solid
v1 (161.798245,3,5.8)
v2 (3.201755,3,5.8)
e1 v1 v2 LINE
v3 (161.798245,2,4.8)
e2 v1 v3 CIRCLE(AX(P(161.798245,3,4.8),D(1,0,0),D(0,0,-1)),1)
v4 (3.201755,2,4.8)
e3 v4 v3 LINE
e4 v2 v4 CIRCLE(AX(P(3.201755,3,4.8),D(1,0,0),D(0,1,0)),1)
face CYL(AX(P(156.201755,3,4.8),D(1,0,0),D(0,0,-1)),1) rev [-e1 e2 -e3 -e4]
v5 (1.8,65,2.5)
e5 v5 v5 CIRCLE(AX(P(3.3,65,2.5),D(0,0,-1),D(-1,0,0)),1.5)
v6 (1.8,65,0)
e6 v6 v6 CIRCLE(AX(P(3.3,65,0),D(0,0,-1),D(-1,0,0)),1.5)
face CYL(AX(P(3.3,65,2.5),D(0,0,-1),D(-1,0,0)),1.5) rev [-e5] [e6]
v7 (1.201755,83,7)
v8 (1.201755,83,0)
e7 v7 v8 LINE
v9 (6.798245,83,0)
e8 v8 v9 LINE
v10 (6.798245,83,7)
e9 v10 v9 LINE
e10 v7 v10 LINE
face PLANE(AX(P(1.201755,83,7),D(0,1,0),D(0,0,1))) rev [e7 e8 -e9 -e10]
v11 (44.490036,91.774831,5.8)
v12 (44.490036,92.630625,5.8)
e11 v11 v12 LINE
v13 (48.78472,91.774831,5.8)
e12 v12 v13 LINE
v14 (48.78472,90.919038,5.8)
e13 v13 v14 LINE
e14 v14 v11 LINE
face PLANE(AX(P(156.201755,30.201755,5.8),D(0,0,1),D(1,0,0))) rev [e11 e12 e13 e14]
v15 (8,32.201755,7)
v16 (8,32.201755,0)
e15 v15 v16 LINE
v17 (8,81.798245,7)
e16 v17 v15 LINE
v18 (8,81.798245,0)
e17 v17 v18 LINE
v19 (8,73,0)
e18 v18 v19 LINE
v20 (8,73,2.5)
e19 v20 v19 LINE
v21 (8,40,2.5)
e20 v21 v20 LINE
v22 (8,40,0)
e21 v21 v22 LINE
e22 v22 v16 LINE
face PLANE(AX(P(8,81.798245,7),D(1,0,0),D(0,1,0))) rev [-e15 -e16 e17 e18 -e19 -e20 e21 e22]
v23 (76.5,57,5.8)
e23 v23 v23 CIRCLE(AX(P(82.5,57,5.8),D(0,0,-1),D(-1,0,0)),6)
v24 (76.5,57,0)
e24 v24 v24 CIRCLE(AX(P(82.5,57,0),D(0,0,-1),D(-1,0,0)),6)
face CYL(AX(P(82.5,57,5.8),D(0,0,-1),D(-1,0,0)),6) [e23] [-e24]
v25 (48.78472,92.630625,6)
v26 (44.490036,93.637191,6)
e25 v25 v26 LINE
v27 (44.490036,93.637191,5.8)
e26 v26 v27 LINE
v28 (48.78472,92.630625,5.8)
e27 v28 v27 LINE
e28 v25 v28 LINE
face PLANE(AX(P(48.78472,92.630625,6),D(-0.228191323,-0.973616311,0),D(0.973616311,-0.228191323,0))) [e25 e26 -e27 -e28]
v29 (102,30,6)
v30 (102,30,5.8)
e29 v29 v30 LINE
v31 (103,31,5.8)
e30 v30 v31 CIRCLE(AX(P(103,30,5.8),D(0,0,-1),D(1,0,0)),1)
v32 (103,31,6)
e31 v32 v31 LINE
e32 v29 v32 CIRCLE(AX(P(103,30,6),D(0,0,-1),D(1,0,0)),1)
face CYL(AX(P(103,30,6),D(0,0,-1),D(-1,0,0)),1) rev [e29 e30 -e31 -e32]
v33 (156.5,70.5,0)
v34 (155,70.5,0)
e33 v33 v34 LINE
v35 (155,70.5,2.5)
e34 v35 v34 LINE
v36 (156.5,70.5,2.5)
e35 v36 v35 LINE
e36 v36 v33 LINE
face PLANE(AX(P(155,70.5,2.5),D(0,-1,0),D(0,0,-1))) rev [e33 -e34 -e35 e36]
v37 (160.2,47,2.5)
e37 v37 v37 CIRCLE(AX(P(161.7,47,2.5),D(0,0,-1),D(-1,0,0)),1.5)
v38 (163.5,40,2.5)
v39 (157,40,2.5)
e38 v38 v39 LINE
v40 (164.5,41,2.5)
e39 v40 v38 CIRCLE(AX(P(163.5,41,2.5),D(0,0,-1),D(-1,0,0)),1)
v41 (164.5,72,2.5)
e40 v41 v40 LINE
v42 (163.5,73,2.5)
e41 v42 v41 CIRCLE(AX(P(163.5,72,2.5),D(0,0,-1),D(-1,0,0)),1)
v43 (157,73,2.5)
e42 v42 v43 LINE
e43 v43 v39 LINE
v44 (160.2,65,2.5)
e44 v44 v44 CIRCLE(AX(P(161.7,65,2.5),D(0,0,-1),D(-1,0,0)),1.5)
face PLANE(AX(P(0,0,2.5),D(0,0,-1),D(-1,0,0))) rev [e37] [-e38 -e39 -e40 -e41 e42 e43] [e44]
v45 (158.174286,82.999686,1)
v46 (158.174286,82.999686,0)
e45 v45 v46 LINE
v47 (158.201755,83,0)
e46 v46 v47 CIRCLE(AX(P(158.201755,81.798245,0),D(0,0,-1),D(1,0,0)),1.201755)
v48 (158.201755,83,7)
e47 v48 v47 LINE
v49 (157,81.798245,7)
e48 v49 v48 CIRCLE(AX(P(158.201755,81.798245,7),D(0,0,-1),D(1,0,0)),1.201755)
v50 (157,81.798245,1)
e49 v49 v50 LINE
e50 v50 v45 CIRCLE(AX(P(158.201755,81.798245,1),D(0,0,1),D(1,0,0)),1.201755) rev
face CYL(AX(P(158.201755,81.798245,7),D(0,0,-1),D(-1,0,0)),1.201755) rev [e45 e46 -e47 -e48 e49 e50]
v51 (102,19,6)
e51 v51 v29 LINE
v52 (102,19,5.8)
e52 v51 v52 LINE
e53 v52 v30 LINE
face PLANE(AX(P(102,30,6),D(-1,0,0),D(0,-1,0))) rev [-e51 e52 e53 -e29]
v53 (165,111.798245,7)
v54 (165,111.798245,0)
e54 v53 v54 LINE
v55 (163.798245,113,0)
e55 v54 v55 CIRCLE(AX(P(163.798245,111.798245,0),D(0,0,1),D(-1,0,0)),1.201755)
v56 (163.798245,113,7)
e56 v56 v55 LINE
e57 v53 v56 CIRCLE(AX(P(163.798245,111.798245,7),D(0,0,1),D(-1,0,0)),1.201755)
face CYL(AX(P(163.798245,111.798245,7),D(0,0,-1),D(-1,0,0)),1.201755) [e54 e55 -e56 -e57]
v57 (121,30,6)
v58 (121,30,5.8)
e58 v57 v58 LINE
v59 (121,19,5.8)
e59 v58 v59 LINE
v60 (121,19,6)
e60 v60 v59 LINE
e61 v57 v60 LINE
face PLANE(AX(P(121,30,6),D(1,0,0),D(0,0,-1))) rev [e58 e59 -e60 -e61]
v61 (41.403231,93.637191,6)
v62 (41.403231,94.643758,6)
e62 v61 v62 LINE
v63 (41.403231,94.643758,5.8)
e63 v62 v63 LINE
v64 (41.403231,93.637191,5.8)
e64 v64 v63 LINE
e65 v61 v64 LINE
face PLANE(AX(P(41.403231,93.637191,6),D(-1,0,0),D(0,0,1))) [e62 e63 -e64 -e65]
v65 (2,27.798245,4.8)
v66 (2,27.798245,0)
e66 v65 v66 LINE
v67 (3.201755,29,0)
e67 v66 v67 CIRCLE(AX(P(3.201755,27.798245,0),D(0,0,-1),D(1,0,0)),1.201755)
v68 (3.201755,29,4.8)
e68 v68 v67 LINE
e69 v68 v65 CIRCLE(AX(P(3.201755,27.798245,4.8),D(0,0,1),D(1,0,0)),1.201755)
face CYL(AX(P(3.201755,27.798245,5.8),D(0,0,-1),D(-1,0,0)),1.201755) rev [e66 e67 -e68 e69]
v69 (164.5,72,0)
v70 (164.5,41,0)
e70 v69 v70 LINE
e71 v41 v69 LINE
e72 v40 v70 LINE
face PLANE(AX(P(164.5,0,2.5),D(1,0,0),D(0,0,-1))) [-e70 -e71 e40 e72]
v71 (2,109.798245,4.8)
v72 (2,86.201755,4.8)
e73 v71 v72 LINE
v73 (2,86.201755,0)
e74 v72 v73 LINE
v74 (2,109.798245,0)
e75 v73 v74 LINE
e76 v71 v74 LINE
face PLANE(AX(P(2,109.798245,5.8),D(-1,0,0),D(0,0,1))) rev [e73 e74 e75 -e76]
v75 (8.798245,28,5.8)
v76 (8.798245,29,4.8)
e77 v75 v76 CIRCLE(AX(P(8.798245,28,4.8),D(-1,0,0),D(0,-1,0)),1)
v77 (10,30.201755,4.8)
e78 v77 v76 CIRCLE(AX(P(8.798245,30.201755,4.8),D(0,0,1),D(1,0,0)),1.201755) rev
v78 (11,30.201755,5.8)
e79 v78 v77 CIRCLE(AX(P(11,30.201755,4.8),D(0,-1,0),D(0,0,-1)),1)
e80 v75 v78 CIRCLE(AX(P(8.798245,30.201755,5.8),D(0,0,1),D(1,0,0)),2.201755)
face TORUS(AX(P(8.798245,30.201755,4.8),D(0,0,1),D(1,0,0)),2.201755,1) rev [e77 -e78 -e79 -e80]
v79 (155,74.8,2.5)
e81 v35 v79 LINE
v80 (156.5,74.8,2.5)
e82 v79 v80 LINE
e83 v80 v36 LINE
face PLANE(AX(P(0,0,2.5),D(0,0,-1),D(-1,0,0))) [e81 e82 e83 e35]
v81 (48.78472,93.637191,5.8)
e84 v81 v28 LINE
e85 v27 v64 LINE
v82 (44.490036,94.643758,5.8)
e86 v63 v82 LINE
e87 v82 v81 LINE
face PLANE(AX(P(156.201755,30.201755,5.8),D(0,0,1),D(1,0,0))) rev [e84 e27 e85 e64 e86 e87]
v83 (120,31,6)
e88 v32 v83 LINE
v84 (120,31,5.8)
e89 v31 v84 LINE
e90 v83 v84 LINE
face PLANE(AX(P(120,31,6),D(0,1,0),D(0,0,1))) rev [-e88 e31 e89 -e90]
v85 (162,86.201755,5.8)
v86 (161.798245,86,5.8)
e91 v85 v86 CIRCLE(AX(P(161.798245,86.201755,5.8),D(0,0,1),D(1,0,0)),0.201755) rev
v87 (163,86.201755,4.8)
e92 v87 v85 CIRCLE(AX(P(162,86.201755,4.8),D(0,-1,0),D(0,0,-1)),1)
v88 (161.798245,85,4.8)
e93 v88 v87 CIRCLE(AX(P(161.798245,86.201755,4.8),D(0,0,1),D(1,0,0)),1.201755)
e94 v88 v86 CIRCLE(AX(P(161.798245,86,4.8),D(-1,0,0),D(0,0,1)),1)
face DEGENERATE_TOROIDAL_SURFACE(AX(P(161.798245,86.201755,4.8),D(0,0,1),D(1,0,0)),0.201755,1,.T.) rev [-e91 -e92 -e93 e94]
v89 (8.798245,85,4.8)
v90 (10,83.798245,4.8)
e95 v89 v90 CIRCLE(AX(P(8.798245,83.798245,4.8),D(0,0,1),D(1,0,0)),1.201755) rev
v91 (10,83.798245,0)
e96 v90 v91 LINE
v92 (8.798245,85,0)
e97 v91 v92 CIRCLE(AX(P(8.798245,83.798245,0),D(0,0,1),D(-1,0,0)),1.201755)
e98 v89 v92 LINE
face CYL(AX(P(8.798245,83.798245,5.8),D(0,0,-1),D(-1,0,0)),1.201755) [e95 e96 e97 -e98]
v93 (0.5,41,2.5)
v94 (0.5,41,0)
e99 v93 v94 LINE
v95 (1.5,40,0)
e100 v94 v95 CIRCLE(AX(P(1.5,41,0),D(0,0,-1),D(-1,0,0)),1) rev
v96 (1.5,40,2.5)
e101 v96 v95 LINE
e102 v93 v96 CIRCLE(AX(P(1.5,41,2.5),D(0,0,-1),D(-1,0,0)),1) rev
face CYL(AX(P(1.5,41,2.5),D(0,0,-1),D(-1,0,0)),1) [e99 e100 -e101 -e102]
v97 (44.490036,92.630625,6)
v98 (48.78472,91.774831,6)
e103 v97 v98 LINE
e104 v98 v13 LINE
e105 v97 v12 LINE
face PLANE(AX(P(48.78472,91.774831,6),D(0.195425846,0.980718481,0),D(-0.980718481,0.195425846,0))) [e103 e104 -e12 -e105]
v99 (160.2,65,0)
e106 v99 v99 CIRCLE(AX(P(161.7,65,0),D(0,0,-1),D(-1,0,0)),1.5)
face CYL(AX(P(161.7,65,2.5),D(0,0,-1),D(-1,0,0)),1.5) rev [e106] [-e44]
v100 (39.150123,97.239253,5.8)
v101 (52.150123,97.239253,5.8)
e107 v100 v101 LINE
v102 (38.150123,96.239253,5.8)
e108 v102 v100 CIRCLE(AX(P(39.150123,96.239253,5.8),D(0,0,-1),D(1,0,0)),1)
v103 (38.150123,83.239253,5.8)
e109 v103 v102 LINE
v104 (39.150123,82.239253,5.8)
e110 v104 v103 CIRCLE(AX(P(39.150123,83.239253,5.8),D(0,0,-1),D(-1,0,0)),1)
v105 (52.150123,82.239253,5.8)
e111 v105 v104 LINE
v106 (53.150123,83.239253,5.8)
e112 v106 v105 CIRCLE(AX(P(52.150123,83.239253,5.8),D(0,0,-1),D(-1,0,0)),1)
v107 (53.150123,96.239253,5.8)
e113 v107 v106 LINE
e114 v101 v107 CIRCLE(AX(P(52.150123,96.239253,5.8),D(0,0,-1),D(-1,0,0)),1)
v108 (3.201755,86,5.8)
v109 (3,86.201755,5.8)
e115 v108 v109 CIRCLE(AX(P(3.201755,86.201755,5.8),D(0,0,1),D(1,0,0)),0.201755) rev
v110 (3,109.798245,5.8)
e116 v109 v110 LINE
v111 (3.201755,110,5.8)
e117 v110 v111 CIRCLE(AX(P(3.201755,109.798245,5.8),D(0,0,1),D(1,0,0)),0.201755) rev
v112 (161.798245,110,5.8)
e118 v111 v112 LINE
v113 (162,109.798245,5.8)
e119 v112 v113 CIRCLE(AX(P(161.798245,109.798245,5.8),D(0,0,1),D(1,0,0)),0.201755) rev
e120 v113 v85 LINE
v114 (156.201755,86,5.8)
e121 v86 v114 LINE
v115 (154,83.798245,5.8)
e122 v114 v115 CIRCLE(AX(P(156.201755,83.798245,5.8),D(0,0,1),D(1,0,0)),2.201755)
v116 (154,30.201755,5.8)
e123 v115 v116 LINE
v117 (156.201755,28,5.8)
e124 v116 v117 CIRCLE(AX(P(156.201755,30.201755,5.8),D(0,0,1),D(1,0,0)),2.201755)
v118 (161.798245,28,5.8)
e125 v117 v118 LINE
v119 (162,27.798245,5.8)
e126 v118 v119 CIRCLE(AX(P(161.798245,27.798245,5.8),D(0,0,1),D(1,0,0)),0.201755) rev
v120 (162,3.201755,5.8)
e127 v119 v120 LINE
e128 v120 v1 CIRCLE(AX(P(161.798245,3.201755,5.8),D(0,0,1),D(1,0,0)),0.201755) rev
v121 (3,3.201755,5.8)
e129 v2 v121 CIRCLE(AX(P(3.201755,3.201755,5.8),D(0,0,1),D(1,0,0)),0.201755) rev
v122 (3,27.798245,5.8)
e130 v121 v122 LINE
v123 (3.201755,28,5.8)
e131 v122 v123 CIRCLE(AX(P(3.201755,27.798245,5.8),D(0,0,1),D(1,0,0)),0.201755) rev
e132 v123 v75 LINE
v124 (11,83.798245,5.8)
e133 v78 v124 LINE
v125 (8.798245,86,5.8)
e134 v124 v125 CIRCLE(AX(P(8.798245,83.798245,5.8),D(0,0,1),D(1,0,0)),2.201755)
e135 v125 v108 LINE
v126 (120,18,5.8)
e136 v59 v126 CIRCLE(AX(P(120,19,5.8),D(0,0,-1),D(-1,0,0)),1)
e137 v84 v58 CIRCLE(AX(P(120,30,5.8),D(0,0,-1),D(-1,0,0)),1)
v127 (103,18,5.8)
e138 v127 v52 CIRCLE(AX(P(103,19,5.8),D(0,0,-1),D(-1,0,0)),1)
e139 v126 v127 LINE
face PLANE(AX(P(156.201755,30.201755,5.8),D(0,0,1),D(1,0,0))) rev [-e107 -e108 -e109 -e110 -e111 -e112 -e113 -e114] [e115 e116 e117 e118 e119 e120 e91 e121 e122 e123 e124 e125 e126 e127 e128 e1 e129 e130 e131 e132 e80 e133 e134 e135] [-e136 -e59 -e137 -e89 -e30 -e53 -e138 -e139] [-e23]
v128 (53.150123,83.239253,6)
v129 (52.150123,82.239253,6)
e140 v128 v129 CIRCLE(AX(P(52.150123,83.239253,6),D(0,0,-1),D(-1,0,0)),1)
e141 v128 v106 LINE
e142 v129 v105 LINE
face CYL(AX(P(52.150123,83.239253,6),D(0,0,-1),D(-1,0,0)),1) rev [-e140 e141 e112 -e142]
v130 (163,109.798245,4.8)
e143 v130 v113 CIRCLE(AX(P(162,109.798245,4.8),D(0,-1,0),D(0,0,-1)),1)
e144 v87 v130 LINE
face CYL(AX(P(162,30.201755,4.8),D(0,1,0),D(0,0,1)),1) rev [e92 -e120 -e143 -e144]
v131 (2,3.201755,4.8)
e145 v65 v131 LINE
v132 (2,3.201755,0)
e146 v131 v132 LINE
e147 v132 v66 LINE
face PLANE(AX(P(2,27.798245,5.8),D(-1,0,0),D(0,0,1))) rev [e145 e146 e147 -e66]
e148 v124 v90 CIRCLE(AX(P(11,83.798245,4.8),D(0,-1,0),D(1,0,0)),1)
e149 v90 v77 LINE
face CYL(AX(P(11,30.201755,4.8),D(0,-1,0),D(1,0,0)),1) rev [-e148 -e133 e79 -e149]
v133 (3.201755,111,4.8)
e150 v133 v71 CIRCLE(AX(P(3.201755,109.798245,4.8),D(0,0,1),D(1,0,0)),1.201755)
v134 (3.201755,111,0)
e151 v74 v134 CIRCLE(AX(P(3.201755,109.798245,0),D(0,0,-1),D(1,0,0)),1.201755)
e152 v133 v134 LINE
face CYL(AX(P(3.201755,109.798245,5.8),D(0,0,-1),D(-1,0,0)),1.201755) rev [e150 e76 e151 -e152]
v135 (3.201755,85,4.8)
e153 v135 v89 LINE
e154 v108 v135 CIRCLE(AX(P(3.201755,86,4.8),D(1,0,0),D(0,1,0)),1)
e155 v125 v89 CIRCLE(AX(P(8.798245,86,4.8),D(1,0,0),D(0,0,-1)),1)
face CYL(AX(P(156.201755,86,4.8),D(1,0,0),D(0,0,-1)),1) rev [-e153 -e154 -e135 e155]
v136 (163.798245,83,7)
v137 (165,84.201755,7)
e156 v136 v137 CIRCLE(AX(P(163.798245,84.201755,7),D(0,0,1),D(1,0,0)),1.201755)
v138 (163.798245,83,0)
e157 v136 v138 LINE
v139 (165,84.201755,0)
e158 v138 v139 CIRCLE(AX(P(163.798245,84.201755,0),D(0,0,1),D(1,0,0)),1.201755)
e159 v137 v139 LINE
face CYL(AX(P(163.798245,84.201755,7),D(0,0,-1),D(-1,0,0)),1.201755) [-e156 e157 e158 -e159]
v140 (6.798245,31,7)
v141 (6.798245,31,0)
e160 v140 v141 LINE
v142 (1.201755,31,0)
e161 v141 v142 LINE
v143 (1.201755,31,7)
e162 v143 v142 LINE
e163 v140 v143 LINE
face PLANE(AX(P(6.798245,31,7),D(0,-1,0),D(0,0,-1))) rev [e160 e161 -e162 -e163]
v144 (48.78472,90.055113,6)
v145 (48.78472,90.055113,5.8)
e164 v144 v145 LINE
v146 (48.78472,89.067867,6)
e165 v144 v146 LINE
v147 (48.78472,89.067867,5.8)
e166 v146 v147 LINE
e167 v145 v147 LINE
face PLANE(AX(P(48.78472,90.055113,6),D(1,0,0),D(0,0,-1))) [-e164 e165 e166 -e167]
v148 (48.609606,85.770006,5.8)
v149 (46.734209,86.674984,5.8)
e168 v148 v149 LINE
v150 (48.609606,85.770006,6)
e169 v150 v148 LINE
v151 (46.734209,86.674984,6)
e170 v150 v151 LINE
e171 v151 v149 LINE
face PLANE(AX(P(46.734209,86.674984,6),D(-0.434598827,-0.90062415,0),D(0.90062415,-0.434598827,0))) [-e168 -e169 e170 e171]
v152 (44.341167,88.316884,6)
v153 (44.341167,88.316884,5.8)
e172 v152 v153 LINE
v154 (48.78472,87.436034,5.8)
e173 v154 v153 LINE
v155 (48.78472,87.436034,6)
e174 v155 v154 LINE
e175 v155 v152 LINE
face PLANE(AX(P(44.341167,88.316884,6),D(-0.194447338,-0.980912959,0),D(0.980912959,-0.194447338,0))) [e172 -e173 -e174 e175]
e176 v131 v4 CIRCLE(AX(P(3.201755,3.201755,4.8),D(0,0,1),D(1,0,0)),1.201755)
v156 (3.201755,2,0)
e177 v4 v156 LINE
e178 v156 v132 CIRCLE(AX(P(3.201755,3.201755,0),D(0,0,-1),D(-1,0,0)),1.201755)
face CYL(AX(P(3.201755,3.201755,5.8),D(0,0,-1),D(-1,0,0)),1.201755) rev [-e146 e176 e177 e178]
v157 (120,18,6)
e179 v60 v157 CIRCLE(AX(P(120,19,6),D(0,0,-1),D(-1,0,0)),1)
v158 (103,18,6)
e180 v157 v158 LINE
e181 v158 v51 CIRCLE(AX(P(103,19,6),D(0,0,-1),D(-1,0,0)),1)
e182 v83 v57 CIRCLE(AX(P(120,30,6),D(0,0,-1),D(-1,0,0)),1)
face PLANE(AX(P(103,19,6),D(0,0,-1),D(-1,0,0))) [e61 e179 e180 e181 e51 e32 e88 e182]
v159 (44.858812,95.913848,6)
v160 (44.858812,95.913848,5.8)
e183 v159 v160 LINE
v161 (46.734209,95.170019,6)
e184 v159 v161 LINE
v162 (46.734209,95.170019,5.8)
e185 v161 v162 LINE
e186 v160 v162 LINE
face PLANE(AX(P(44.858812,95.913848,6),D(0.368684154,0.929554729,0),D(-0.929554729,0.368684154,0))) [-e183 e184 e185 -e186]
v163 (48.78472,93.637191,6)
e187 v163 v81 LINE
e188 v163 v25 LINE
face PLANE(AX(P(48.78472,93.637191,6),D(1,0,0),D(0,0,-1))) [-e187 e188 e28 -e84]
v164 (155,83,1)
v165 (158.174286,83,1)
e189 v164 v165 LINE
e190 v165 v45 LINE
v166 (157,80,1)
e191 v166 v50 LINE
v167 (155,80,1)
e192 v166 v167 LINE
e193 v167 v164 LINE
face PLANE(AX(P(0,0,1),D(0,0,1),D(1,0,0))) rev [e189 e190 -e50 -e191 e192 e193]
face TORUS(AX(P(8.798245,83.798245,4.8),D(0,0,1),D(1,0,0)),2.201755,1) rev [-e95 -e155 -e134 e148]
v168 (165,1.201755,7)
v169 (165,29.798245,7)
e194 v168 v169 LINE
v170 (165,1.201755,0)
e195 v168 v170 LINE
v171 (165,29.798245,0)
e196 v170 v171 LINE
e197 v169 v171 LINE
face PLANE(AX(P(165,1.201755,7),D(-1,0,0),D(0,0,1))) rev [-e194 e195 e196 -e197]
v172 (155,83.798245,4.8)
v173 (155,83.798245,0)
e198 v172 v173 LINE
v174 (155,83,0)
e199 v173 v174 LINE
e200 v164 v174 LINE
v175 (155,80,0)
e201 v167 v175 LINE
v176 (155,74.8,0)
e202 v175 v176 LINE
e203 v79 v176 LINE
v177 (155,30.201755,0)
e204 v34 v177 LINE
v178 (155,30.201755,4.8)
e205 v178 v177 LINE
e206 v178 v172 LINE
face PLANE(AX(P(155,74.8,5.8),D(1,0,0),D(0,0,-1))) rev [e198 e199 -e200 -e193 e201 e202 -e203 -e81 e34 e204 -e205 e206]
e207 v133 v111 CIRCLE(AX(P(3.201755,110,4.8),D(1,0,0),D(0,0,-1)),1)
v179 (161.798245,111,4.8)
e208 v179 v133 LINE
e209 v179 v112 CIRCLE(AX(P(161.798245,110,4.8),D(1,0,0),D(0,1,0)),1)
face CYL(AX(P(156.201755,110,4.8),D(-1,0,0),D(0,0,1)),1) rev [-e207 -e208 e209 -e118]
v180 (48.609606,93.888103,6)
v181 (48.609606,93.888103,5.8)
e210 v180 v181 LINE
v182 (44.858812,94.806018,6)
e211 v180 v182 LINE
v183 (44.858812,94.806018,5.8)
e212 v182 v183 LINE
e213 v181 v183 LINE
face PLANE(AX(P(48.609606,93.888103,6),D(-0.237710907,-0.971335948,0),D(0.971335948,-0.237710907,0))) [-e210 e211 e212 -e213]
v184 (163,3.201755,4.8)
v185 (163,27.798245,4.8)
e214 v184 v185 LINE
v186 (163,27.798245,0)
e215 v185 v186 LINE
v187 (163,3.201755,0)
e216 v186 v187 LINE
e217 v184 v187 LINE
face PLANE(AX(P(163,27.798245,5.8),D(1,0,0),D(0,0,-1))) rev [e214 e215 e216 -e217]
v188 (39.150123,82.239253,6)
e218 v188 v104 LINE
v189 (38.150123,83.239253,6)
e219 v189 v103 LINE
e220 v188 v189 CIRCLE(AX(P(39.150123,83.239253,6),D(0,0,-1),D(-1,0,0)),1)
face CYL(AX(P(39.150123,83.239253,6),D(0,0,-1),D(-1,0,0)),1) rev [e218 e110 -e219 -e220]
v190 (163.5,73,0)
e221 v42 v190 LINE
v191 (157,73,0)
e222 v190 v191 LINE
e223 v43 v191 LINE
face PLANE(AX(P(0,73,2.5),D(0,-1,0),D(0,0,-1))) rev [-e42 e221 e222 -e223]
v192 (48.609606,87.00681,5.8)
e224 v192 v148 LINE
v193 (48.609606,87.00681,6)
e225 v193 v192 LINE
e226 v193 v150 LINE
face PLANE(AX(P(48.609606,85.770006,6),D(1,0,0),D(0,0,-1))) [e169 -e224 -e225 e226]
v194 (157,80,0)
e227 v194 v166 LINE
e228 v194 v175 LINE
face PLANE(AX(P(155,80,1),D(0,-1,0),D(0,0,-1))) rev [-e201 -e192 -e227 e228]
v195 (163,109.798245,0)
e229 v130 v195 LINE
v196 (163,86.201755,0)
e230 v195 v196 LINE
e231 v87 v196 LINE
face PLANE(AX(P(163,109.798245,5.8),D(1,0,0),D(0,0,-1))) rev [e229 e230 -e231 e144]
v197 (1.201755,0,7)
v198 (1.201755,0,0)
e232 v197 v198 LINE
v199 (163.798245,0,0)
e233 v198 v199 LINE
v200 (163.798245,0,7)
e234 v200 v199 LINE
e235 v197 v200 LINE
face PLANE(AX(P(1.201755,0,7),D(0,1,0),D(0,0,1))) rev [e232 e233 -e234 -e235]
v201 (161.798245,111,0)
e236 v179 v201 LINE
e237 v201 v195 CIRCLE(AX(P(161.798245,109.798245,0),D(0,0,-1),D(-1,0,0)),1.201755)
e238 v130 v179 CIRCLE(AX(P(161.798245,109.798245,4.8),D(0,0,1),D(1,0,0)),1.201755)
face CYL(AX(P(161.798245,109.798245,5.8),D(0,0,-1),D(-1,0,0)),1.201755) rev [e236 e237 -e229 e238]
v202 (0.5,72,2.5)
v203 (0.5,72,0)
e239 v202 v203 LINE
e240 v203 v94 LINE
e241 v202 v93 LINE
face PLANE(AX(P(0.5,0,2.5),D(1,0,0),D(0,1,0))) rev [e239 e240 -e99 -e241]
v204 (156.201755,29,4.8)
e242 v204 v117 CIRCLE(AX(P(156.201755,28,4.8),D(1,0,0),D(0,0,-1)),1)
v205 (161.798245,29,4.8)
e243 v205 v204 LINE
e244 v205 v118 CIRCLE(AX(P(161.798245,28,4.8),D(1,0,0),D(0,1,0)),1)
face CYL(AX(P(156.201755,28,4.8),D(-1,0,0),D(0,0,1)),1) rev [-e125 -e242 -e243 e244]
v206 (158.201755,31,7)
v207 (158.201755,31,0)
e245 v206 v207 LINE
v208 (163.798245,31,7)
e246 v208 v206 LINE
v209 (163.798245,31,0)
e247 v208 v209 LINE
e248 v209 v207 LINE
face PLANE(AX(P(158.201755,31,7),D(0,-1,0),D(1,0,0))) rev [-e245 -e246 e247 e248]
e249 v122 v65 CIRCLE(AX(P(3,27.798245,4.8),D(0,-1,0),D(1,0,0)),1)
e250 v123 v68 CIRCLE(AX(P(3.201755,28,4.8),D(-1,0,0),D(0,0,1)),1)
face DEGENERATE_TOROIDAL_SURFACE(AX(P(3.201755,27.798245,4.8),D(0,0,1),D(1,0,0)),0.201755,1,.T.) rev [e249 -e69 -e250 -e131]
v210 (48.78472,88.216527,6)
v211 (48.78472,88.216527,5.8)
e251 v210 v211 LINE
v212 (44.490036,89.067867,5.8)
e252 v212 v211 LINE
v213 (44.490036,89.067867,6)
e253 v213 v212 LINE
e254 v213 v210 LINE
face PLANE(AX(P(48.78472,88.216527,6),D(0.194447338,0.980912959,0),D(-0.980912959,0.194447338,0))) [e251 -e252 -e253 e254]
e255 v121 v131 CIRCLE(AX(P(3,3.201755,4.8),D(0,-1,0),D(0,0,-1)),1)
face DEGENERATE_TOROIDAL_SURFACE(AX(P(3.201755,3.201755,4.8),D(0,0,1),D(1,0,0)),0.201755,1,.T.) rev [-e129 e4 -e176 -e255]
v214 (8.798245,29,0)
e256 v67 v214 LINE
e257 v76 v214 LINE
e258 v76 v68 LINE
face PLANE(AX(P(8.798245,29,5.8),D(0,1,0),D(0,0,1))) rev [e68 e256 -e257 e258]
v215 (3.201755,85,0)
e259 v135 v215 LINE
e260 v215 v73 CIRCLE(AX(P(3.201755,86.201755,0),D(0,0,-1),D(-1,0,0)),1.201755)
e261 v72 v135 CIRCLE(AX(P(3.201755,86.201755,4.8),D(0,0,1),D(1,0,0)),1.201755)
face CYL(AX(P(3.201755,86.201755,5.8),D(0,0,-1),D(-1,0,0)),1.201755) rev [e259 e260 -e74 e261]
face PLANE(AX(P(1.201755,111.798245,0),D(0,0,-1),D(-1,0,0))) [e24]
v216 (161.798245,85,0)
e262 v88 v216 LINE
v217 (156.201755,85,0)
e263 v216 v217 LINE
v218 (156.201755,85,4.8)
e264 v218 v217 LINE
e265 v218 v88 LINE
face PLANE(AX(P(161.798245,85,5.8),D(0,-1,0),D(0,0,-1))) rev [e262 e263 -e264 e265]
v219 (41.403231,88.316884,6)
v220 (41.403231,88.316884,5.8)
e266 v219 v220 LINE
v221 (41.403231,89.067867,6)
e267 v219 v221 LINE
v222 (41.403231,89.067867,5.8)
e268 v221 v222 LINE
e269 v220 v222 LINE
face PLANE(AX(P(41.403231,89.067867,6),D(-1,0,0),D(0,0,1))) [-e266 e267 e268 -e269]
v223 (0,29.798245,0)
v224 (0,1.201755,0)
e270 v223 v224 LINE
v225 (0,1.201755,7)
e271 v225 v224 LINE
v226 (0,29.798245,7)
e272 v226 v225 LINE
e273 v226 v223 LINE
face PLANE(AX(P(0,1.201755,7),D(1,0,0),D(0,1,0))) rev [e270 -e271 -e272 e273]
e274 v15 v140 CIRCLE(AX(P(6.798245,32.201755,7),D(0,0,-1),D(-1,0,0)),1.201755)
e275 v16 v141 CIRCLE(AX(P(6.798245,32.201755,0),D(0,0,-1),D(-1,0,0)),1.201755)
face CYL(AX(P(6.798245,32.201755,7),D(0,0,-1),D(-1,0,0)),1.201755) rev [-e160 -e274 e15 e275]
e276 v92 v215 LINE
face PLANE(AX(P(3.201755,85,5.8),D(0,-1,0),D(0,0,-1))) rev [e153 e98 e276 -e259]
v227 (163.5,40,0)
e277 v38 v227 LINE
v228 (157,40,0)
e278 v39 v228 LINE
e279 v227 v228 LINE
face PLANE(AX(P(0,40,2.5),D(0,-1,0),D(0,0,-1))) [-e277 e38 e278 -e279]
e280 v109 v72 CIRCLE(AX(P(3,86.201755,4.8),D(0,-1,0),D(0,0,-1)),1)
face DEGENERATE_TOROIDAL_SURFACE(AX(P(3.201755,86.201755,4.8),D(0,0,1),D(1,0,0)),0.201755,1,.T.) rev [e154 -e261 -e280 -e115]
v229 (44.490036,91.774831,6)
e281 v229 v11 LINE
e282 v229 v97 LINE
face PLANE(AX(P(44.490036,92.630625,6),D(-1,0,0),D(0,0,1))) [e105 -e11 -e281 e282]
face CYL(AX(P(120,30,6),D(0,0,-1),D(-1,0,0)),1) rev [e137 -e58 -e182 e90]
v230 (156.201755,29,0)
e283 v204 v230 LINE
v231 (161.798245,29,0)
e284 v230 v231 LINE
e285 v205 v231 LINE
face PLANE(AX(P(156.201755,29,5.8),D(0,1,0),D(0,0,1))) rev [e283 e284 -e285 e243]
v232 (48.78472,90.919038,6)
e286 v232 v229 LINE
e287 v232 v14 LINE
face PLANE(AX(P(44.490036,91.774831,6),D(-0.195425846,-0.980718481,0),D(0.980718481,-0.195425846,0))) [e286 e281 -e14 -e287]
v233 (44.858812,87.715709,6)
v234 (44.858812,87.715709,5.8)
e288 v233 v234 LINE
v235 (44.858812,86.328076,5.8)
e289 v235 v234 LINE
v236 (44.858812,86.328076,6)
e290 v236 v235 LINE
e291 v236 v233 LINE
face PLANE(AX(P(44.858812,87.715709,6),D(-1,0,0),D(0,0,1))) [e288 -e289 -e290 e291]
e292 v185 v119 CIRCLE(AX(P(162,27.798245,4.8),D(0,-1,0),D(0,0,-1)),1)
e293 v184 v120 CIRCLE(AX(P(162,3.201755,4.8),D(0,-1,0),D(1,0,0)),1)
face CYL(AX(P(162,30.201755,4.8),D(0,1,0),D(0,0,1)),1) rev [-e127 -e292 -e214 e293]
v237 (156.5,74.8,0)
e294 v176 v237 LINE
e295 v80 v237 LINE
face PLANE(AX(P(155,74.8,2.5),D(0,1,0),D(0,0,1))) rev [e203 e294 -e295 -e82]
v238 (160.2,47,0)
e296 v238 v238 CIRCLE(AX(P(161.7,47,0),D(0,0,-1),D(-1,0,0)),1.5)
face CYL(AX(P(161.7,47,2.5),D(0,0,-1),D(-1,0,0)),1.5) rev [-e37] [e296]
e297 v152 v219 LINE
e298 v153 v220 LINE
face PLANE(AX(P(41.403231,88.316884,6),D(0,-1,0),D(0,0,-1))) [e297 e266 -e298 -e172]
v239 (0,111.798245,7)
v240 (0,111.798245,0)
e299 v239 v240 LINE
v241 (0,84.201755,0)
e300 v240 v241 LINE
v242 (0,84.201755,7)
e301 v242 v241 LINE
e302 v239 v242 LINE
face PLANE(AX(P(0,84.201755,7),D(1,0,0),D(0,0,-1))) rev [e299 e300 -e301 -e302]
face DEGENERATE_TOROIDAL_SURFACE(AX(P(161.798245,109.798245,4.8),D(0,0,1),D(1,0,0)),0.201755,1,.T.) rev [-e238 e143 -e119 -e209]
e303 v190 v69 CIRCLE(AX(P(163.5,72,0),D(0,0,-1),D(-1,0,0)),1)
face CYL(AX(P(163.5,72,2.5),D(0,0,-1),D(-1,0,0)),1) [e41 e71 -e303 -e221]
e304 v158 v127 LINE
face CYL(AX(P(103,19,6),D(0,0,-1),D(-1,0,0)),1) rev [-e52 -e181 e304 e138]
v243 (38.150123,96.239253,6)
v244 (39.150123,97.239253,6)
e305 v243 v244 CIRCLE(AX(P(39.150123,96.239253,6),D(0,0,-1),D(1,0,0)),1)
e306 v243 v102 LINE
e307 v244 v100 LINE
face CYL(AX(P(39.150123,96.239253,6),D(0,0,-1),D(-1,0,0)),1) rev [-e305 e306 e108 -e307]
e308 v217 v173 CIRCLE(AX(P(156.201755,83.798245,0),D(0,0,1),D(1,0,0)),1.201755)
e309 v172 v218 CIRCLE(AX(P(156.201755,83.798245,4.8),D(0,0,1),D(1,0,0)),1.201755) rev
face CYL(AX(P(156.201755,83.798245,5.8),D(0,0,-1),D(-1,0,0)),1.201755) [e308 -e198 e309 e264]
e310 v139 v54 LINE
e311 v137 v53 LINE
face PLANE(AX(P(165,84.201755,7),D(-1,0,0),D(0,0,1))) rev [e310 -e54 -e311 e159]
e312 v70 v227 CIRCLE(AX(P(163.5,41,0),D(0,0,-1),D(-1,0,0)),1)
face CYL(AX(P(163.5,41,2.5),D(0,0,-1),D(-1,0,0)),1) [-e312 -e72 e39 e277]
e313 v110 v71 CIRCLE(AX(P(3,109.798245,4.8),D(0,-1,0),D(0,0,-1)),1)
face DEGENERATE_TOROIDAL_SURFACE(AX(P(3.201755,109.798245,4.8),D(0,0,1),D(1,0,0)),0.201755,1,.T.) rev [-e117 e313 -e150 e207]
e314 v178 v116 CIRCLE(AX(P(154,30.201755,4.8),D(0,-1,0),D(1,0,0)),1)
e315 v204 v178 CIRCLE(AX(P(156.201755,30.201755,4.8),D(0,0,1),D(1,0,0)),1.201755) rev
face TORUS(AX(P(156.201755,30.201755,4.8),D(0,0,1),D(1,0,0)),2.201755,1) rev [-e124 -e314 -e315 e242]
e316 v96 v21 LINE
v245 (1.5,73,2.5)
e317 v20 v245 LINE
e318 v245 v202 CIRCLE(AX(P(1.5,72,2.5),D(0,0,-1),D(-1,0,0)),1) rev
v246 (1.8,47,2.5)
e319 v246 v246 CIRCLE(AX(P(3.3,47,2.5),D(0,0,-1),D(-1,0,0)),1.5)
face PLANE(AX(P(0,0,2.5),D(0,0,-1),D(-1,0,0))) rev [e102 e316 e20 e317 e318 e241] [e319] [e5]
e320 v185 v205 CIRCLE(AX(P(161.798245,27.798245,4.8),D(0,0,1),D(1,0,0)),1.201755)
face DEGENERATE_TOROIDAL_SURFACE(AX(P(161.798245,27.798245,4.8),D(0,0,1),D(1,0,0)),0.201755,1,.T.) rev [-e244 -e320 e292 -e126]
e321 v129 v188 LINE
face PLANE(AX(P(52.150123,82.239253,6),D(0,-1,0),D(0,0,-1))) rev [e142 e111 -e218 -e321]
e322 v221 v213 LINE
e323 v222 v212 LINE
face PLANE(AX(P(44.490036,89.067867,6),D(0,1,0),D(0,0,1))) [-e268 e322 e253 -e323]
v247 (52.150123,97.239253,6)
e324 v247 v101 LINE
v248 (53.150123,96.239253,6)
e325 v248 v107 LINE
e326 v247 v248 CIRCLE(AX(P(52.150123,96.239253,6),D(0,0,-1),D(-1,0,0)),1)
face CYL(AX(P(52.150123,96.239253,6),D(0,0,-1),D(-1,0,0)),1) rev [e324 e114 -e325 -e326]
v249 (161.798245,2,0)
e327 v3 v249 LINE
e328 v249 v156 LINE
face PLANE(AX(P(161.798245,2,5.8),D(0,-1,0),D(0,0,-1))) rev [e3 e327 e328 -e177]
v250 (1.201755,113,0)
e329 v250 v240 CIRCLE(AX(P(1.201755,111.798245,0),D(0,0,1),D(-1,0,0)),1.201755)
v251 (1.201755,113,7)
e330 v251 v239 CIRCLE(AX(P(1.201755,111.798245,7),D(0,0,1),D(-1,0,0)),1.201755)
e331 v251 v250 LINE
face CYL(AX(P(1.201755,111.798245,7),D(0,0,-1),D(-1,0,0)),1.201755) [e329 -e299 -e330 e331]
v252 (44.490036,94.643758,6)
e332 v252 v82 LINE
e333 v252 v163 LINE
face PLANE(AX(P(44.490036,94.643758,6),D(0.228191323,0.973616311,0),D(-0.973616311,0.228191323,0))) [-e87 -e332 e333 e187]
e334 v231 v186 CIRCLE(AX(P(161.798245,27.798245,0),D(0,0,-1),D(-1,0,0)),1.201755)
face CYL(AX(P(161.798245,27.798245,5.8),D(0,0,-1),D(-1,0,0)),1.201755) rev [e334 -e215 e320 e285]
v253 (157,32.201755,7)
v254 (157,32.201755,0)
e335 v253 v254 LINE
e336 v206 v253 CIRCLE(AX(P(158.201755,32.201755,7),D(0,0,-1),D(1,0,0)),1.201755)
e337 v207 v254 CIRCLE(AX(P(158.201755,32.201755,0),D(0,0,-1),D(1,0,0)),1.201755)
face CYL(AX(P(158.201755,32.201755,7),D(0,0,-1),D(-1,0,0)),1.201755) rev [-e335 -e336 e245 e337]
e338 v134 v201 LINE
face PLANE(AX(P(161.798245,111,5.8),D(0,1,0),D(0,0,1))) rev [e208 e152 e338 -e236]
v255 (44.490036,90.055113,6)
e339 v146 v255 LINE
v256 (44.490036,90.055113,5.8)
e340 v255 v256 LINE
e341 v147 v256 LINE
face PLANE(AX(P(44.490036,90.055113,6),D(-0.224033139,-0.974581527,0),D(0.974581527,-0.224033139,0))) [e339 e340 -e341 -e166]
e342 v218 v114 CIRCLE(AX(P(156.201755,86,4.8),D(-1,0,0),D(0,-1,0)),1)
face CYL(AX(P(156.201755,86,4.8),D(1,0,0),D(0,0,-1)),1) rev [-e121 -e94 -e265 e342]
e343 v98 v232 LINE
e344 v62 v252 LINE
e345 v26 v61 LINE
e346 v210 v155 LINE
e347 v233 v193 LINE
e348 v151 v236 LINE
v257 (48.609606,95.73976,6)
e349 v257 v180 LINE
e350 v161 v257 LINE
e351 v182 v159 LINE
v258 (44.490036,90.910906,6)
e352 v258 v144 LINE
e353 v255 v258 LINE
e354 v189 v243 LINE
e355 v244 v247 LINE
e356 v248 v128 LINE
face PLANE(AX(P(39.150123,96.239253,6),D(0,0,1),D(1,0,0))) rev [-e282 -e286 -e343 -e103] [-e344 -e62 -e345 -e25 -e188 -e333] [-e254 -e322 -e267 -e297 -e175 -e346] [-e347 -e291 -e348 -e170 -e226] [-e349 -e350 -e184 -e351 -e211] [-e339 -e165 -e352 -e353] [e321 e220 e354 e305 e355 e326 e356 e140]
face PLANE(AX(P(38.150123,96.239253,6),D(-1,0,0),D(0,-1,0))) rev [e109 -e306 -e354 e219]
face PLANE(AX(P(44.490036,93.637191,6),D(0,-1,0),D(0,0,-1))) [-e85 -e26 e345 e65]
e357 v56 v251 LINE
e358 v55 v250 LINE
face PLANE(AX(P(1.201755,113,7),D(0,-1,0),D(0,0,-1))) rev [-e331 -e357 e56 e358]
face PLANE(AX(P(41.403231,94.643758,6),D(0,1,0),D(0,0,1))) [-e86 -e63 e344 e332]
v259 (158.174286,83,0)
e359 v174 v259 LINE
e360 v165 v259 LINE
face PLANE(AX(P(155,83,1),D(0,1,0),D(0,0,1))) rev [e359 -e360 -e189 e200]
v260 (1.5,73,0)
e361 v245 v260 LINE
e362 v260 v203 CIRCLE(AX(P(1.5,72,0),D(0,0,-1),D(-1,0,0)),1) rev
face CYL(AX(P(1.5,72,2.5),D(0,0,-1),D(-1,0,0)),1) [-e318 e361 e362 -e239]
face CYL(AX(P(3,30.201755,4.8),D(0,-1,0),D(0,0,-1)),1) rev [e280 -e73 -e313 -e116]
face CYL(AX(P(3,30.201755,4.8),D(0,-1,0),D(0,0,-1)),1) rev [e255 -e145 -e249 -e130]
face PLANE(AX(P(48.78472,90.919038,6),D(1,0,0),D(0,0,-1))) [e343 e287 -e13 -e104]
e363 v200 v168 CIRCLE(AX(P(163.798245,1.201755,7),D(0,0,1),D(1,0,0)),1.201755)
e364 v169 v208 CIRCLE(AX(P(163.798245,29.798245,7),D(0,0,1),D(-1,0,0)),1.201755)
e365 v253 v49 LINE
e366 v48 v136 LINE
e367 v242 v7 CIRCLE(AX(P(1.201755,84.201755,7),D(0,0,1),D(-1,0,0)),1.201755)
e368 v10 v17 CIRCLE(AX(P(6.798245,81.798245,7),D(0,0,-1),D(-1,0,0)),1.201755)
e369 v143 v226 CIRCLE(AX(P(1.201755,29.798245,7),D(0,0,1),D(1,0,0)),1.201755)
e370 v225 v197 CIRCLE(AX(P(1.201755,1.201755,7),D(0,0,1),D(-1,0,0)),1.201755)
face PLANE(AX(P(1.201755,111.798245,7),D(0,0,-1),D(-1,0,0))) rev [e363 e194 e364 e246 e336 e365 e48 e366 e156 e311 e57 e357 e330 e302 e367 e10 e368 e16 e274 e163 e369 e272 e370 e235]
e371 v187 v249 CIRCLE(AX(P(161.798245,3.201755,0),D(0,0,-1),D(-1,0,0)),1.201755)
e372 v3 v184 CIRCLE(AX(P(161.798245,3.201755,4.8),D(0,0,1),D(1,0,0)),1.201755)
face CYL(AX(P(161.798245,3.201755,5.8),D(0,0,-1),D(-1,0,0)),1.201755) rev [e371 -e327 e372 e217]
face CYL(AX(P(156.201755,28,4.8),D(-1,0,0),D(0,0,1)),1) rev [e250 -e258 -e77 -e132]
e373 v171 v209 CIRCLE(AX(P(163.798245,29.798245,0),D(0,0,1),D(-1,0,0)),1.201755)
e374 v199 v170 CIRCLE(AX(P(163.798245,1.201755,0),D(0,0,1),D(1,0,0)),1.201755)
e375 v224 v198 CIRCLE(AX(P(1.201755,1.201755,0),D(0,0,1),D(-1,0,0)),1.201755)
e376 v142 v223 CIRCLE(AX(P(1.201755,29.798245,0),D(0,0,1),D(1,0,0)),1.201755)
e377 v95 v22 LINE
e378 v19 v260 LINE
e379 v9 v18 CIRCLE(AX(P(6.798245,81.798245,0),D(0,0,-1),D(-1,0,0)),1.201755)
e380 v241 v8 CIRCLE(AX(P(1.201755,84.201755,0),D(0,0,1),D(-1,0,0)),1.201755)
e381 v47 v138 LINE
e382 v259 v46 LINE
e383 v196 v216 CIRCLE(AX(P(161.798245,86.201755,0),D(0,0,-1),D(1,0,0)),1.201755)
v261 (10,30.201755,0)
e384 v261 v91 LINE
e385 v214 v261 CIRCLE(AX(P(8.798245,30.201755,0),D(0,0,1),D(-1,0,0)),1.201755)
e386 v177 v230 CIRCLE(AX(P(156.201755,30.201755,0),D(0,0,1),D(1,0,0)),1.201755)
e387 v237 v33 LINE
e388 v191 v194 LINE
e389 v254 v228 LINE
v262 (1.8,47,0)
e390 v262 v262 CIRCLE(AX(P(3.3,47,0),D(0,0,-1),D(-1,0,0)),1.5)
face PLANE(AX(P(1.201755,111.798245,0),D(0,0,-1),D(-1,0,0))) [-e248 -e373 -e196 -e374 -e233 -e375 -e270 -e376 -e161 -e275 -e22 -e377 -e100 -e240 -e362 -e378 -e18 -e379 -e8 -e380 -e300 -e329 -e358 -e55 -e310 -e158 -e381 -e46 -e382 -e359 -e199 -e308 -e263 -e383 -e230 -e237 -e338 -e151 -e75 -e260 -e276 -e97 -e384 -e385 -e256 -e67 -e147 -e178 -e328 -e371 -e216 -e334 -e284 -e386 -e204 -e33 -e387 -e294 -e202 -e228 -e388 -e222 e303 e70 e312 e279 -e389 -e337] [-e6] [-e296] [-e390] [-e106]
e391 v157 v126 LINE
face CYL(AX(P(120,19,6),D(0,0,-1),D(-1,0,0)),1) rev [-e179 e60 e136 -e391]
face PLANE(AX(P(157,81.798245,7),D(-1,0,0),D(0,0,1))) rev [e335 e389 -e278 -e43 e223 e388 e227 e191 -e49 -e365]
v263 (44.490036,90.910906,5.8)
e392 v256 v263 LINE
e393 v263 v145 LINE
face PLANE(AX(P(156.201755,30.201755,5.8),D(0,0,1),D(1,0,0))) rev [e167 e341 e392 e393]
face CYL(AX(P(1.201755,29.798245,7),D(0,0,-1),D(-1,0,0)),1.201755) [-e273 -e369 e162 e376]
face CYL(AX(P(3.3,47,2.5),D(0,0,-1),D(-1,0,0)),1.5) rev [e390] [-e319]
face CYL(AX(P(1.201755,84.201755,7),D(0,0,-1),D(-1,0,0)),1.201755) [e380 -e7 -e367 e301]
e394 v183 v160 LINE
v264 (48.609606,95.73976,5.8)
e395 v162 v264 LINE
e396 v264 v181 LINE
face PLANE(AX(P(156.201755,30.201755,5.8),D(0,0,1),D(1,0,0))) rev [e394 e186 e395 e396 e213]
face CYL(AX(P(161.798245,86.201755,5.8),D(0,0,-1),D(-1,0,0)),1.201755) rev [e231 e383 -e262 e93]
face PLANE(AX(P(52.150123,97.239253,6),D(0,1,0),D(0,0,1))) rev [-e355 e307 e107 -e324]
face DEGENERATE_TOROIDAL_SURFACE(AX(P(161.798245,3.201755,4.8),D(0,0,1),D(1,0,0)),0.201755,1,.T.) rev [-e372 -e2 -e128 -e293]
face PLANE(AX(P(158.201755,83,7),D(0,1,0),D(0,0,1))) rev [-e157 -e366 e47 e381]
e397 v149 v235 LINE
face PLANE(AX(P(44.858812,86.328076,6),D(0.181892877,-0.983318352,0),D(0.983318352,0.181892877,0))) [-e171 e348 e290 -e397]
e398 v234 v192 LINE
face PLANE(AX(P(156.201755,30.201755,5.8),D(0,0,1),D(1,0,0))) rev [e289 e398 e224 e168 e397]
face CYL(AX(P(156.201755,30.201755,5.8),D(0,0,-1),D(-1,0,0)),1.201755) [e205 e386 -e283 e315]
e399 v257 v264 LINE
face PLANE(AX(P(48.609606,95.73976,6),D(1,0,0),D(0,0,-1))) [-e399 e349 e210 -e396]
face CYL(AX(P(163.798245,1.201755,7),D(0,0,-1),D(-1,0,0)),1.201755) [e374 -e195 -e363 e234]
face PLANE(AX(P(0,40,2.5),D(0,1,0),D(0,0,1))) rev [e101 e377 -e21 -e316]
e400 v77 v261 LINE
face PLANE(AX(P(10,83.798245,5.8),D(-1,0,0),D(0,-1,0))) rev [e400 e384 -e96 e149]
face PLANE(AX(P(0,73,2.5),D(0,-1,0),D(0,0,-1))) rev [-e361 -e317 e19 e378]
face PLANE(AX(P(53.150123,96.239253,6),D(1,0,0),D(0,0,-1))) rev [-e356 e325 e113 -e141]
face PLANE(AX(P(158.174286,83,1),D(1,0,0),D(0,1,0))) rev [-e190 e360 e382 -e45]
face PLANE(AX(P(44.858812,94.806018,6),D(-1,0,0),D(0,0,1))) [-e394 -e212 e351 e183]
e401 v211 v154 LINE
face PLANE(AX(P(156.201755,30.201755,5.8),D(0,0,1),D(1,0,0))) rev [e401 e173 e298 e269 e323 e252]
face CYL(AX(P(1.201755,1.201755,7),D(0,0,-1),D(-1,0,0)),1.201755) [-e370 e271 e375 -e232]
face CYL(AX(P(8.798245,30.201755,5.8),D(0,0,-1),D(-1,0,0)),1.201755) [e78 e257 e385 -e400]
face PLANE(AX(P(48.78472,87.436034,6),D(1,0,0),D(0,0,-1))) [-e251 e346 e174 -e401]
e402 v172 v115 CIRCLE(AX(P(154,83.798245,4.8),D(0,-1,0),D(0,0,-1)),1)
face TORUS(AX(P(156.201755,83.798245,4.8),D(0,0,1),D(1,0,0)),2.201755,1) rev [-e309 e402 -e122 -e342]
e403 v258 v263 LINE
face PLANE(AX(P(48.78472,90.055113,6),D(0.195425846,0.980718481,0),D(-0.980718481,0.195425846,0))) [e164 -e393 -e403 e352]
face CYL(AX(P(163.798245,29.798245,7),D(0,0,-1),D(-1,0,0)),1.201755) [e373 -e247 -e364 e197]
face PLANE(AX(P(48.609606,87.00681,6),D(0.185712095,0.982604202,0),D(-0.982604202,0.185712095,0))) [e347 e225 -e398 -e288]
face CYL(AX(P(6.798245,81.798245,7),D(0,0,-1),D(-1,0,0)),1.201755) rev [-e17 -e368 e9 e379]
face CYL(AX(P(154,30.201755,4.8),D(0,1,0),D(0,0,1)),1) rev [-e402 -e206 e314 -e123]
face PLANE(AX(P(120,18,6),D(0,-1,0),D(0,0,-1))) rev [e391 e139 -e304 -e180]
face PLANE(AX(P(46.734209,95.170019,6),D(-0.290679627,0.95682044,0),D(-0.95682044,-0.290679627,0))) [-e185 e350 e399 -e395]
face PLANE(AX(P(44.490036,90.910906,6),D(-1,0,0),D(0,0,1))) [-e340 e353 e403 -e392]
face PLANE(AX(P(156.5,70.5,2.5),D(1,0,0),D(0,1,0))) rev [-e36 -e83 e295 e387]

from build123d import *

# Parameters (mm, degrees)
EXTRUDE_1_DEPTH     = 7
SKETCH_2_R          = 6
CUT_EXTRUDE_1_DEPTH = 5.8
CUT_EXTRUDE_2_DEPTH = 0.2
FILLET_1_R          = 1
SKETCH_4_R          = 1.5
EXTRUDE_3_DEPTH     = 2.5
SKETCH_5_W          = 1.5
SKETCH_5_H          = 4.3
CUT_EXTRUDE_3_DEPTH = 2.5
SKETCH_6_W          = 3.174285876
SKETCH_6_H          = 3
CUT_EXTRUDE_4_DEPTH = 1


with BuildPart() as part:
    # Эскиз1 → Бобышка-Вытянуть1 (new body)
    with BuildSketch(Plane.XY):
        with BuildLine():
            Line((1.201755047, 83), (6.798244953, 83))
            ThreePointArc((6.798244953, 83), (7.648014096, 82.648014096), (8, 81.798244953))
            Line((8, 81.798244953), (8, 32.201755047))
            ThreePointArc((8, 32.201755047), (7.648014096, 31.351985904), (6.798244953, 31))
            Line((6.798244953, 31), (1.201755047, 31))
            ThreePointArc((1.201755047, 31), (0.351985904, 30.648014096), (0, 29.798244953))
            Line((0, 29.798244953), (0, 1.201755047))
            ThreePointArc((0, 1.201755047), (0.351985904, 0.351985904), (1.201755047, 0))
            Line((1.201755047, 0), (163.798244953, 0))
            ThreePointArc((163.798244953, 0), (164.648014096, 0.351985904), (165, 1.201755047))
            Line((165, 1.201755047), (165, 29.798244953))
            ThreePointArc((165, 29.798244953), (164.648014096, 30.648014096), (163.798244953, 31))
            Line((163.798244953, 31), (158.201755047, 31))
            ThreePointArc((158.201755047, 31), (157.351985904, 31.351985904), (157, 32.201755047))
            Line((157, 32.201755047), (157, 81.798244953))
            ThreePointArc((157, 81.798244953), (157.351985904, 82.648014096), (158.201755047, 83))
            Line((158.201755047, 83), (163.798244953, 83))
            ThreePointArc((163.798244953, 83), (164.648014096, 83.351985904), (165, 84.201755047))
            Line((165, 84.201755047), (165, 111.798244953))
            ThreePointArc((165, 111.798244953), (164.648014096, 112.648014096), (163.798244953, 113))
            Line((163.798244953, 113), (1.201755047, 113))
            ThreePointArc((1.201755047, 113), (0.351985904, 112.648014096), (0, 111.798244953))
            Line((0, 111.798244953), (0, 84.201755047))
            ThreePointArc((0, 84.201755047), (0.351985904, 83.351985904), (1.201755047, 83))
        make_face()
    extrude(amount=EXTRUDE_1_DEPTH)

    # Эскиз2 → Вырез-Вытянуть1 (cut)
    with BuildSketch(Plane(origin=(0, 0, 0), x_dir=(-1, 0, 0), z_dir=(0, 0, -1))):
        with BuildLine():
            Line((-161.798244953, 111), (-3.201755047, 111))
            ThreePointArc((-3.201755047, 111), (-2.351985904, 110.648014096), (-2, 109.798244953))
            Line((-2, 109.798244953), (-2, 86.201755047))
            ThreePointArc((-2, 86.201755047), (-2.351985904, 85.351985904), (-3.201755047, 85))
            Line((-3.201755047, 85), (-8.798244953, 85))
            ThreePointArc((-8.798244953, 85), (-9.648014096, 84.648014096), (-10, 83.798244953))
            Line((-10, 83.798244953), (-10, 30.201755047))
            ThreePointArc((-10, 30.201755047), (-9.648014096, 29.351985904), (-8.798244953, 29))
            Line((-8.798244953, 29), (-3.201755047, 29))
            ThreePointArc((-3.201755047, 29), (-2.351985904, 28.648014096), (-2, 27.798244953))
            Line((-2, 27.798244953), (-2, 3.201755047))
            ThreePointArc((-2, 3.201755047), (-2.351985904, 2.351985904), (-3.201755047, 2))
            Line((-3.201755047, 2), (-161.798244953, 2))
            ThreePointArc((-161.798244953, 2), (-162.648014096, 2.351985904), (-163, 3.201755047))
            Line((-163, 3.201755047), (-163, 27.798244953))
            ThreePointArc((-163, 27.798244953), (-162.648014096, 28.648014096), (-161.798244953, 29))
            Line((-161.798244953, 29), (-156.201755047, 29))
            ThreePointArc((-156.201755047, 29), (-155.351985904, 29.351985904), (-155, 30.201755047))
            Line((-155, 30.201755047), (-155, 70.5))
            Line((-155, 70.5), (-155, 74.8))
            Line((-155, 74.8), (-155, 83.798244953))
            ThreePointArc((-155, 83.798244953), (-155.351985904, 84.648014096), (-156.201755047, 85))
            Line((-156.201755047, 85), (-161.798244953, 85))
            ThreePointArc((-161.798244953, 85), (-162.648014096, 85.351985904), (-163, 86.201755047))
            Line((-163, 86.201755047), (-163, 109.798244953))
            ThreePointArc((-163, 109.798244953), (-162.648014096, 110.648014096), (-161.798244953, 111))
        make_face()
        with Locations((-82.5, 57)):
            Circle(SKETCH_2_R, mode=Mode.SUBTRACT)
    extrude(amount=-CUT_EXTRUDE_1_DEPTH, mode=Mode.SUBTRACT)

    # Эскиз3 → Вырез-Вытянуть2 (cut)
    # profile 1 of 2: a face of its own
    with BuildSketch(Plane(origin=(0, 0, 5.8), x_dir=(-1, 0, 0), z_dir=(0, 0, -1))):
        with BuildLine():
            Line((-120, 31), (-103, 31))
            ThreePointArc((-103, 31), (-102.292893219, 30.707106781), (-102, 30))
            Line((-102, 30), (-102, 19))
            ThreePointArc((-102, 19), (-102.292893219, 18.292893219), (-103, 18))
            Line((-103, 18), (-120, 18))
            ThreePointArc((-120, 18), (-120.707106781, 18.292893219), (-121, 19))
            Line((-121, 19), (-121, 30))
            ThreePointArc((-121, 30), (-120.707106781, 30.707106781), (-120, 31))
        make_face()
    # profile 2 of 2: a face of its own
    with BuildSketch(Plane(origin=(0, 0, 5.8), x_dir=(-1, 0, 0), z_dir=(0, 0, -1))):
        with BuildLine():
            Line((-52.1501229, 97.239252875), (-39.1501229, 97.239252875))
            ThreePointArc((-39.1501229, 97.239252875), (-38.443016119, 96.946359657), (-38.1501229, 96.239252875))
            Line((-38.1501229, 96.239252875), (-38.1501229, 83.239252875))
            ThreePointArc((-38.1501229, 83.239252875), (-38.443016119, 82.532146094), (-39.1501229, 82.239252875))
            Line((-39.1501229, 82.239252875), (-52.1501229, 82.239252875))
            ThreePointArc((-52.1501229, 82.239252875), (-52.857229681, 82.532146094), (-53.1501229, 83.239252875))
            Line((-53.1501229, 83.239252875), (-53.1501229, 96.239252875))
            ThreePointArc((-53.1501229, 96.239252875), (-52.857229681, 96.946359657), (-52.1501229, 97.239252875))
        make_face()
        Polygon((-41.403231286, 94.64375803), (-44.490035641, 94.64375803), (-48.784719961, 93.637191392), (-48.784719961, 92.630624755), (-44.490035641, 93.637191392), (-41.403231286, 93.637191392), align=None, mode=Mode.SUBTRACT)
        Polygon((-48.784719961, 91.774831443), (-44.490035641, 92.630624755), (-44.490035641, 91.774831443), (-48.784719961, 90.91903813), align=None, mode=Mode.SUBTRACT)
        Polygon((-48.784719961, 90.055112789), (-44.490035641, 90.910906102), (-44.490035641, 90.055112789), (-48.784719961, 89.067866896), align=None, mode=Mode.SUBTRACT)
        Polygon((-48.784719961, 88.216527408), (-44.490035641, 89.067866896), (-41.403231286, 89.067866896), (-41.403231286, 88.316883581), (-44.341167482, 88.316883581), (-48.784719961, 87.436033812), align=None, mode=Mode.SUBTRACT)
        Polygon((-48.609605566, 93.888102843), (-44.858812452, 94.806018458), (-44.858812452, 95.913847648), (-46.734209009, 95.170019477), (-48.609605566, 95.739760204), align=None, mode=Mode.SUBTRACT)
        Polygon((-48.609605566, 87.006809767), (-44.858812452, 87.715709289), (-44.858812452, 86.328076183), (-46.734209009, 86.674984459), (-48.609605566, 85.770006347), align=None, mode=Mode.SUBTRACT)
    extrude(amount=-CUT_EXTRUDE_2_DEPTH, mode=Mode.SUBTRACT)

    # Скругление1
    fillet_1_edges = [part.edges().sort_by_distance(p)[0] for p in [
        (155, 57, 5.8),
        (155.351985904, 84.648014096, 5.8),
        (159, 85, 5.8),
        (162.648014096, 85.351985904, 5.8),
        (163, 98, 5.8),
        (162.648014096, 110.648014096, 5.8),
        (82.5, 111, 5.8),
        (2.351985904, 110.648014096, 5.8),
        (2, 98, 5.8),
        (2.351985904, 85.351985904, 5.8),
        (6, 85, 5.8),
        (9.648014096, 84.648014096, 5.8),
        (10, 57, 5.8),
        (9.648014096, 29.351985904, 5.8),
        (6, 29, 5.8),
        (2.351985904, 28.648014096, 5.8),
        (2, 15.5, 5.8),
        (2.351985904, 2.351985904, 5.8),
        (82.5, 2, 5.8),
        (162.648014096, 2.351985904, 5.8),
        (163, 15.5, 5.8),
        (162.648014096, 28.648014096, 5.8),
        (159, 29, 5.8),
        (155.351985904, 29.351985904, 5.8),
    ]]
    fillet(fillet_1_edges, radius=FILLET_1_R)

    # Эскиз4 → Бобышка-Вытянуть3 (add)
    # profile 1 of 2: a face of its own
    with BuildSketch(Plane(origin=(0, 0, 0), x_dir=(-1, 0, 0), z_dir=(0, 0, -1))):
        with BuildLine():
            Line((-157, 73), (-163.5, 73))
            ThreePointArc((-163.5, 73), (-164.207106781, 72.707106781), (-164.5, 72))
            Line((-164.5, 72), (-164.5, 41))
            ThreePointArc((-164.5, 41), (-164.207106781, 40.292893219), (-163.5, 40))
            Line((-163.5, 40), (-157, 40))
            Line((-157, 40), (-157, 73))
        make_face()
        with Locations((-161.7, 47)):
            Circle(SKETCH_4_R, mode=Mode.SUBTRACT)
        with Locations((-161.7, 65)):
            Circle(SKETCH_4_R, mode=Mode.SUBTRACT)
    # profile 2 of 2: a face of its own
    with BuildSketch(Plane(origin=(0, 0, 0), x_dir=(-1, 0, 0), z_dir=(0, 0, -1))):
        with BuildLine():
            Line((-1.5, 73), (-8, 73))
            Line((-8, 73), (-8, 40))
            Line((-8, 40), (-1.5, 40))
            ThreePointArc((-1.5, 40), (-0.792893219, 40.292893219), (-0.5, 41))
            Line((-0.5, 41), (-0.5, 72))
            ThreePointArc((-0.5, 72), (-0.792893219, 72.707106781), (-1.5, 73))
        make_face()
        with Locations((-3.3, 47)):
            Circle(SKETCH_4_R, mode=Mode.SUBTRACT)
        with Locations((-3.3, 65)):
            Circle(SKETCH_4_R, mode=Mode.SUBTRACT)
    extrude(amount=-EXTRUDE_3_DEPTH)

    # Эскиз5 → Вырез-Вытянуть3 (cut)
    with BuildSketch(Plane(origin=(0, 0, 0), x_dir=(-1, 0, 0), z_dir=(0, 0, -1))):
        with Locations((-155.75, 72.65)):
            Rectangle(SKETCH_5_W, SKETCH_5_H)
    extrude(amount=-CUT_EXTRUDE_3_DEPTH, mode=Mode.SUBTRACT)

    # Эскиз6 → Вырез-Вытянуть4 (cut)
    with BuildSketch(Plane(origin=(0, 0, 0), x_dir=(-1, 0, 0), z_dir=(0, 0, -1))):
        with Locations((-156.587142938, 81.5)):
            Rectangle(SKETCH_6_W, SKETCH_6_H)
    extrude(amount=-CUT_EXTRUDE_4_DEPTH, mode=Mode.SUBTRACT)


solid = part.part
